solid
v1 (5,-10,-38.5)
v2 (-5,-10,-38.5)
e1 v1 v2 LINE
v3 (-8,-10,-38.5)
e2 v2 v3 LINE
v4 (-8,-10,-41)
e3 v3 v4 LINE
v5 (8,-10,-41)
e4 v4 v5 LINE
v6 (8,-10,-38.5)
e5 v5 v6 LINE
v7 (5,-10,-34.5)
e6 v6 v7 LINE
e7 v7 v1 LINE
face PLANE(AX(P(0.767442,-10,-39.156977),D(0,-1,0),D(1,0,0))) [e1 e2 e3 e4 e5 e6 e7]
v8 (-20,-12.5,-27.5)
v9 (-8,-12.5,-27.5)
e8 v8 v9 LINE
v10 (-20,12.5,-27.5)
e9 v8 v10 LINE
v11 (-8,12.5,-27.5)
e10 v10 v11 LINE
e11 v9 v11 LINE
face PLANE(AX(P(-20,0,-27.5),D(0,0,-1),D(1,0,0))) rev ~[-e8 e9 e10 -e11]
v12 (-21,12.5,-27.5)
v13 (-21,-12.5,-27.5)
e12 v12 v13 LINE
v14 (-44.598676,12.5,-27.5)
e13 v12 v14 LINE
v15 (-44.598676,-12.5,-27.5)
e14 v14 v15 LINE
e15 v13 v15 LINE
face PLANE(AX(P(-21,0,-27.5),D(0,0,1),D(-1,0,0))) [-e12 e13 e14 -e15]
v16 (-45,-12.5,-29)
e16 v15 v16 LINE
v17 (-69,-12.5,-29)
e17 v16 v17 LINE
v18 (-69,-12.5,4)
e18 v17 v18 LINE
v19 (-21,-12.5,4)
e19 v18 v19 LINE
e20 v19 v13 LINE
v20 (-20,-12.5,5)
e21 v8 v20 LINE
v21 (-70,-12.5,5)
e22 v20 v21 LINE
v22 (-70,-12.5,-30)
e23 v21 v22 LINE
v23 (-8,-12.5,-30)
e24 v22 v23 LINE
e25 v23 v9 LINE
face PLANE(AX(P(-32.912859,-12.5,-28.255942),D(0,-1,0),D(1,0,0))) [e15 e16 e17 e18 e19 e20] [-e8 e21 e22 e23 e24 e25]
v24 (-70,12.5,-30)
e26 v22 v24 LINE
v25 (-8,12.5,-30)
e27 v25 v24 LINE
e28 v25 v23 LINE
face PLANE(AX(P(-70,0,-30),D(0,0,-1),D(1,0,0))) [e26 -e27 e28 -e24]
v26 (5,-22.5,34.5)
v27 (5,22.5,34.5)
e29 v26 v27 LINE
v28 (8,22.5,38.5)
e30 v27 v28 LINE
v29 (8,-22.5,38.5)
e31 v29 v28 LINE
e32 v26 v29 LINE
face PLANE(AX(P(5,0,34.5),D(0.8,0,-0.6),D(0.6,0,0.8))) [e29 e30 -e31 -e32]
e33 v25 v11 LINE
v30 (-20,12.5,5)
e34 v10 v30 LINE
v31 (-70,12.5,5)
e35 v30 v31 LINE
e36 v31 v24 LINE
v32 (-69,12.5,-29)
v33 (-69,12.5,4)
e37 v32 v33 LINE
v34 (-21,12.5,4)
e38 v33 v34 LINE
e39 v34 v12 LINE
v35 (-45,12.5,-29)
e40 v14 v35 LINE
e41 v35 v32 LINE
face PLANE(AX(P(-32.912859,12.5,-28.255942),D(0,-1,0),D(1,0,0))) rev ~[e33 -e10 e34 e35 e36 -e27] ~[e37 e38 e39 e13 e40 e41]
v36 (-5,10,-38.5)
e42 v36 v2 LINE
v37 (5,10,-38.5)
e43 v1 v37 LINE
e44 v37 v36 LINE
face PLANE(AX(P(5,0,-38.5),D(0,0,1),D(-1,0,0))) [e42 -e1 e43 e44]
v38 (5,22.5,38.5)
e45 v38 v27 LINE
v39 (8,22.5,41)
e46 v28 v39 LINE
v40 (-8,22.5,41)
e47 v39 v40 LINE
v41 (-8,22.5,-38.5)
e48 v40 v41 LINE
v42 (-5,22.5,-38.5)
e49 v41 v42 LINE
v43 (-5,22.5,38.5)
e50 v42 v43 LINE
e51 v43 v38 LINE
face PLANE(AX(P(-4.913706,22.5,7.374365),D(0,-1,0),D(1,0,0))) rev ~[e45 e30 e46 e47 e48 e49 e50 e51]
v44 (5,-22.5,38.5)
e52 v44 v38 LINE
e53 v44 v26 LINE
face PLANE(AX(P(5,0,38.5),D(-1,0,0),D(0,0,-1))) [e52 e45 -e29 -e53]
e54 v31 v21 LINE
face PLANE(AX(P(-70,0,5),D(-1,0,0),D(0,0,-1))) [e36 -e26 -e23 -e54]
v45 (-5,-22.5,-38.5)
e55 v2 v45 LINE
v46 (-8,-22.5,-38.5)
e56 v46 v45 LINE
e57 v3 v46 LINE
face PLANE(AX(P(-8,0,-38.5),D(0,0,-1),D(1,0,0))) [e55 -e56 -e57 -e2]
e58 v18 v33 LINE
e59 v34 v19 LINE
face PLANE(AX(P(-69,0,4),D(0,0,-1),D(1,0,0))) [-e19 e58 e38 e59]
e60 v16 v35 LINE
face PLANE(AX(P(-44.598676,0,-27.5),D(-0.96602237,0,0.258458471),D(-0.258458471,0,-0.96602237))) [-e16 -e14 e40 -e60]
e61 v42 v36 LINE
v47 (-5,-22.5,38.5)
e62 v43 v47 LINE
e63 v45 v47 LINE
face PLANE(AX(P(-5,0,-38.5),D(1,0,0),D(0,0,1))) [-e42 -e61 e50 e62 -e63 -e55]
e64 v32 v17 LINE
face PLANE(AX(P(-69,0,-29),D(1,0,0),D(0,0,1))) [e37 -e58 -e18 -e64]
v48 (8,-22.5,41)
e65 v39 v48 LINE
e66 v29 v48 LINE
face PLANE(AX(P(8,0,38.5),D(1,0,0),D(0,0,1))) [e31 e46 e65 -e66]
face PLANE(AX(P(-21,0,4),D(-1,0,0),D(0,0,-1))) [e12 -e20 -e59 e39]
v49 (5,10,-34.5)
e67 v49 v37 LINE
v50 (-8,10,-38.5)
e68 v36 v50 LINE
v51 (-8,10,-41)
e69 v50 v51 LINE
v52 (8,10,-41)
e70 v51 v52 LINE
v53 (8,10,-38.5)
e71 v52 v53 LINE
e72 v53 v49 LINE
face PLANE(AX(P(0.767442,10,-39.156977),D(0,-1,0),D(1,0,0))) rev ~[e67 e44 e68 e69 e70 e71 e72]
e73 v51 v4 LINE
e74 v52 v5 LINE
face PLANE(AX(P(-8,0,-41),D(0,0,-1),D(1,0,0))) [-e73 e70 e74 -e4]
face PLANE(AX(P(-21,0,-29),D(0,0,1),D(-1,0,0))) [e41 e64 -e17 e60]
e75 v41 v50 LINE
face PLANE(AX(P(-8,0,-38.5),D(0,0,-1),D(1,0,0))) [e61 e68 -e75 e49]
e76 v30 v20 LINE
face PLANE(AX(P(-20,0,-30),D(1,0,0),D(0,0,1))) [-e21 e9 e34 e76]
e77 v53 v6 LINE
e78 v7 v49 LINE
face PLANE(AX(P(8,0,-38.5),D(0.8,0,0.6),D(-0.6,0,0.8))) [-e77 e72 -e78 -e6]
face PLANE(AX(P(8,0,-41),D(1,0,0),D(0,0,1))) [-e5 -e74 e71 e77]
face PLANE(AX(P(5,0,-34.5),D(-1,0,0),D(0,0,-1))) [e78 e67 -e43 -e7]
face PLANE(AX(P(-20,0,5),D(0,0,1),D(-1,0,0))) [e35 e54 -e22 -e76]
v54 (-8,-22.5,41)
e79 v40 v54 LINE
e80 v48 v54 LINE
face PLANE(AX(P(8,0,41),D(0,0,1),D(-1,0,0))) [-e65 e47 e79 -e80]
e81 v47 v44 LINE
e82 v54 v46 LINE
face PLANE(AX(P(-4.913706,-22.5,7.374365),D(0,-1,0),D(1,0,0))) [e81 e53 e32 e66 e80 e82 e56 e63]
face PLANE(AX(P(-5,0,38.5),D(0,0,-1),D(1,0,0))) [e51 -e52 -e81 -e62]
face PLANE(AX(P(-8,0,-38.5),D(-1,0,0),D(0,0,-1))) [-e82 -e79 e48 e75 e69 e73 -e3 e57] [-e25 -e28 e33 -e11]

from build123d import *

# Parameters (mm, degrees)
F1_DEPTH = 22.5
F2_DEPTH = 10
F0_W     = 12
F0_H     = 2.5
F3_DEPTH = 12.5
F4_DEPTH = 12.5
F5_DEPTH = 12.5


# Not quite as in the source:
# - a feature names something its author has since deleted; it is built from what else it names


with BuildPart() as f1:
    # F0 (on Front) → F1 (new body, symmetric)
    with BuildSketch(Plane.XZ):
        Polygon((8, 38.5), (8, 41), (-8, 41), (-8, 8), (-8, -27.5), (-8, -30), (-8, -38.5), (-5, -38.5), (-5, 38.5), (5, 38.5), (5, 34.5), align=None)
    extrude(amount=F1_DEPTH, both=True)

    # F0 (on Front) → F2 (join, symmetric)
    with BuildSketch(Plane.XZ):
        Polygon((-5, -38.5), (-8, -38.5), (-8, -41), (8, -41), (8, -38.5), (5, -34.5), (5, -38.5), align=None)
    extrude(amount=F2_DEPTH, both=True)

    # F0 (on Front) → F3 (join, symmetric)
    with BuildSketch(Plane.XZ):
        with Locations((-14, -28.75)):
            Rectangle(F0_W, F0_H)
    extrude(amount=F3_DEPTH, both=True)

    # F0 (on Front) → F4 (join, symmetric)
    with BuildSketch(Plane.XZ):
        Polygon((-20, -30), (-20, -27.5), (-20, 5), (-70, 5), (-70, -30), (-44.4338369071, -30), align=None)
        Polygon((-21, 4), (-21, -27.5), (-21, -29), (-45, -29), (-69, -29), (-69, 4), align=None, mode=Mode.SUBTRACT)
    extrude(amount=F4_DEPTH, both=True)

    # F0 (on Front) → F5 (join, symmetric)
    with BuildSketch(Plane.XZ):
        Polygon((-21, -29), (-21, -27.5), (-44.5986762643, -27.5), (-45, -29), align=None)
    extrude(amount=F5_DEPTH, both=True)


solid = f1.part
